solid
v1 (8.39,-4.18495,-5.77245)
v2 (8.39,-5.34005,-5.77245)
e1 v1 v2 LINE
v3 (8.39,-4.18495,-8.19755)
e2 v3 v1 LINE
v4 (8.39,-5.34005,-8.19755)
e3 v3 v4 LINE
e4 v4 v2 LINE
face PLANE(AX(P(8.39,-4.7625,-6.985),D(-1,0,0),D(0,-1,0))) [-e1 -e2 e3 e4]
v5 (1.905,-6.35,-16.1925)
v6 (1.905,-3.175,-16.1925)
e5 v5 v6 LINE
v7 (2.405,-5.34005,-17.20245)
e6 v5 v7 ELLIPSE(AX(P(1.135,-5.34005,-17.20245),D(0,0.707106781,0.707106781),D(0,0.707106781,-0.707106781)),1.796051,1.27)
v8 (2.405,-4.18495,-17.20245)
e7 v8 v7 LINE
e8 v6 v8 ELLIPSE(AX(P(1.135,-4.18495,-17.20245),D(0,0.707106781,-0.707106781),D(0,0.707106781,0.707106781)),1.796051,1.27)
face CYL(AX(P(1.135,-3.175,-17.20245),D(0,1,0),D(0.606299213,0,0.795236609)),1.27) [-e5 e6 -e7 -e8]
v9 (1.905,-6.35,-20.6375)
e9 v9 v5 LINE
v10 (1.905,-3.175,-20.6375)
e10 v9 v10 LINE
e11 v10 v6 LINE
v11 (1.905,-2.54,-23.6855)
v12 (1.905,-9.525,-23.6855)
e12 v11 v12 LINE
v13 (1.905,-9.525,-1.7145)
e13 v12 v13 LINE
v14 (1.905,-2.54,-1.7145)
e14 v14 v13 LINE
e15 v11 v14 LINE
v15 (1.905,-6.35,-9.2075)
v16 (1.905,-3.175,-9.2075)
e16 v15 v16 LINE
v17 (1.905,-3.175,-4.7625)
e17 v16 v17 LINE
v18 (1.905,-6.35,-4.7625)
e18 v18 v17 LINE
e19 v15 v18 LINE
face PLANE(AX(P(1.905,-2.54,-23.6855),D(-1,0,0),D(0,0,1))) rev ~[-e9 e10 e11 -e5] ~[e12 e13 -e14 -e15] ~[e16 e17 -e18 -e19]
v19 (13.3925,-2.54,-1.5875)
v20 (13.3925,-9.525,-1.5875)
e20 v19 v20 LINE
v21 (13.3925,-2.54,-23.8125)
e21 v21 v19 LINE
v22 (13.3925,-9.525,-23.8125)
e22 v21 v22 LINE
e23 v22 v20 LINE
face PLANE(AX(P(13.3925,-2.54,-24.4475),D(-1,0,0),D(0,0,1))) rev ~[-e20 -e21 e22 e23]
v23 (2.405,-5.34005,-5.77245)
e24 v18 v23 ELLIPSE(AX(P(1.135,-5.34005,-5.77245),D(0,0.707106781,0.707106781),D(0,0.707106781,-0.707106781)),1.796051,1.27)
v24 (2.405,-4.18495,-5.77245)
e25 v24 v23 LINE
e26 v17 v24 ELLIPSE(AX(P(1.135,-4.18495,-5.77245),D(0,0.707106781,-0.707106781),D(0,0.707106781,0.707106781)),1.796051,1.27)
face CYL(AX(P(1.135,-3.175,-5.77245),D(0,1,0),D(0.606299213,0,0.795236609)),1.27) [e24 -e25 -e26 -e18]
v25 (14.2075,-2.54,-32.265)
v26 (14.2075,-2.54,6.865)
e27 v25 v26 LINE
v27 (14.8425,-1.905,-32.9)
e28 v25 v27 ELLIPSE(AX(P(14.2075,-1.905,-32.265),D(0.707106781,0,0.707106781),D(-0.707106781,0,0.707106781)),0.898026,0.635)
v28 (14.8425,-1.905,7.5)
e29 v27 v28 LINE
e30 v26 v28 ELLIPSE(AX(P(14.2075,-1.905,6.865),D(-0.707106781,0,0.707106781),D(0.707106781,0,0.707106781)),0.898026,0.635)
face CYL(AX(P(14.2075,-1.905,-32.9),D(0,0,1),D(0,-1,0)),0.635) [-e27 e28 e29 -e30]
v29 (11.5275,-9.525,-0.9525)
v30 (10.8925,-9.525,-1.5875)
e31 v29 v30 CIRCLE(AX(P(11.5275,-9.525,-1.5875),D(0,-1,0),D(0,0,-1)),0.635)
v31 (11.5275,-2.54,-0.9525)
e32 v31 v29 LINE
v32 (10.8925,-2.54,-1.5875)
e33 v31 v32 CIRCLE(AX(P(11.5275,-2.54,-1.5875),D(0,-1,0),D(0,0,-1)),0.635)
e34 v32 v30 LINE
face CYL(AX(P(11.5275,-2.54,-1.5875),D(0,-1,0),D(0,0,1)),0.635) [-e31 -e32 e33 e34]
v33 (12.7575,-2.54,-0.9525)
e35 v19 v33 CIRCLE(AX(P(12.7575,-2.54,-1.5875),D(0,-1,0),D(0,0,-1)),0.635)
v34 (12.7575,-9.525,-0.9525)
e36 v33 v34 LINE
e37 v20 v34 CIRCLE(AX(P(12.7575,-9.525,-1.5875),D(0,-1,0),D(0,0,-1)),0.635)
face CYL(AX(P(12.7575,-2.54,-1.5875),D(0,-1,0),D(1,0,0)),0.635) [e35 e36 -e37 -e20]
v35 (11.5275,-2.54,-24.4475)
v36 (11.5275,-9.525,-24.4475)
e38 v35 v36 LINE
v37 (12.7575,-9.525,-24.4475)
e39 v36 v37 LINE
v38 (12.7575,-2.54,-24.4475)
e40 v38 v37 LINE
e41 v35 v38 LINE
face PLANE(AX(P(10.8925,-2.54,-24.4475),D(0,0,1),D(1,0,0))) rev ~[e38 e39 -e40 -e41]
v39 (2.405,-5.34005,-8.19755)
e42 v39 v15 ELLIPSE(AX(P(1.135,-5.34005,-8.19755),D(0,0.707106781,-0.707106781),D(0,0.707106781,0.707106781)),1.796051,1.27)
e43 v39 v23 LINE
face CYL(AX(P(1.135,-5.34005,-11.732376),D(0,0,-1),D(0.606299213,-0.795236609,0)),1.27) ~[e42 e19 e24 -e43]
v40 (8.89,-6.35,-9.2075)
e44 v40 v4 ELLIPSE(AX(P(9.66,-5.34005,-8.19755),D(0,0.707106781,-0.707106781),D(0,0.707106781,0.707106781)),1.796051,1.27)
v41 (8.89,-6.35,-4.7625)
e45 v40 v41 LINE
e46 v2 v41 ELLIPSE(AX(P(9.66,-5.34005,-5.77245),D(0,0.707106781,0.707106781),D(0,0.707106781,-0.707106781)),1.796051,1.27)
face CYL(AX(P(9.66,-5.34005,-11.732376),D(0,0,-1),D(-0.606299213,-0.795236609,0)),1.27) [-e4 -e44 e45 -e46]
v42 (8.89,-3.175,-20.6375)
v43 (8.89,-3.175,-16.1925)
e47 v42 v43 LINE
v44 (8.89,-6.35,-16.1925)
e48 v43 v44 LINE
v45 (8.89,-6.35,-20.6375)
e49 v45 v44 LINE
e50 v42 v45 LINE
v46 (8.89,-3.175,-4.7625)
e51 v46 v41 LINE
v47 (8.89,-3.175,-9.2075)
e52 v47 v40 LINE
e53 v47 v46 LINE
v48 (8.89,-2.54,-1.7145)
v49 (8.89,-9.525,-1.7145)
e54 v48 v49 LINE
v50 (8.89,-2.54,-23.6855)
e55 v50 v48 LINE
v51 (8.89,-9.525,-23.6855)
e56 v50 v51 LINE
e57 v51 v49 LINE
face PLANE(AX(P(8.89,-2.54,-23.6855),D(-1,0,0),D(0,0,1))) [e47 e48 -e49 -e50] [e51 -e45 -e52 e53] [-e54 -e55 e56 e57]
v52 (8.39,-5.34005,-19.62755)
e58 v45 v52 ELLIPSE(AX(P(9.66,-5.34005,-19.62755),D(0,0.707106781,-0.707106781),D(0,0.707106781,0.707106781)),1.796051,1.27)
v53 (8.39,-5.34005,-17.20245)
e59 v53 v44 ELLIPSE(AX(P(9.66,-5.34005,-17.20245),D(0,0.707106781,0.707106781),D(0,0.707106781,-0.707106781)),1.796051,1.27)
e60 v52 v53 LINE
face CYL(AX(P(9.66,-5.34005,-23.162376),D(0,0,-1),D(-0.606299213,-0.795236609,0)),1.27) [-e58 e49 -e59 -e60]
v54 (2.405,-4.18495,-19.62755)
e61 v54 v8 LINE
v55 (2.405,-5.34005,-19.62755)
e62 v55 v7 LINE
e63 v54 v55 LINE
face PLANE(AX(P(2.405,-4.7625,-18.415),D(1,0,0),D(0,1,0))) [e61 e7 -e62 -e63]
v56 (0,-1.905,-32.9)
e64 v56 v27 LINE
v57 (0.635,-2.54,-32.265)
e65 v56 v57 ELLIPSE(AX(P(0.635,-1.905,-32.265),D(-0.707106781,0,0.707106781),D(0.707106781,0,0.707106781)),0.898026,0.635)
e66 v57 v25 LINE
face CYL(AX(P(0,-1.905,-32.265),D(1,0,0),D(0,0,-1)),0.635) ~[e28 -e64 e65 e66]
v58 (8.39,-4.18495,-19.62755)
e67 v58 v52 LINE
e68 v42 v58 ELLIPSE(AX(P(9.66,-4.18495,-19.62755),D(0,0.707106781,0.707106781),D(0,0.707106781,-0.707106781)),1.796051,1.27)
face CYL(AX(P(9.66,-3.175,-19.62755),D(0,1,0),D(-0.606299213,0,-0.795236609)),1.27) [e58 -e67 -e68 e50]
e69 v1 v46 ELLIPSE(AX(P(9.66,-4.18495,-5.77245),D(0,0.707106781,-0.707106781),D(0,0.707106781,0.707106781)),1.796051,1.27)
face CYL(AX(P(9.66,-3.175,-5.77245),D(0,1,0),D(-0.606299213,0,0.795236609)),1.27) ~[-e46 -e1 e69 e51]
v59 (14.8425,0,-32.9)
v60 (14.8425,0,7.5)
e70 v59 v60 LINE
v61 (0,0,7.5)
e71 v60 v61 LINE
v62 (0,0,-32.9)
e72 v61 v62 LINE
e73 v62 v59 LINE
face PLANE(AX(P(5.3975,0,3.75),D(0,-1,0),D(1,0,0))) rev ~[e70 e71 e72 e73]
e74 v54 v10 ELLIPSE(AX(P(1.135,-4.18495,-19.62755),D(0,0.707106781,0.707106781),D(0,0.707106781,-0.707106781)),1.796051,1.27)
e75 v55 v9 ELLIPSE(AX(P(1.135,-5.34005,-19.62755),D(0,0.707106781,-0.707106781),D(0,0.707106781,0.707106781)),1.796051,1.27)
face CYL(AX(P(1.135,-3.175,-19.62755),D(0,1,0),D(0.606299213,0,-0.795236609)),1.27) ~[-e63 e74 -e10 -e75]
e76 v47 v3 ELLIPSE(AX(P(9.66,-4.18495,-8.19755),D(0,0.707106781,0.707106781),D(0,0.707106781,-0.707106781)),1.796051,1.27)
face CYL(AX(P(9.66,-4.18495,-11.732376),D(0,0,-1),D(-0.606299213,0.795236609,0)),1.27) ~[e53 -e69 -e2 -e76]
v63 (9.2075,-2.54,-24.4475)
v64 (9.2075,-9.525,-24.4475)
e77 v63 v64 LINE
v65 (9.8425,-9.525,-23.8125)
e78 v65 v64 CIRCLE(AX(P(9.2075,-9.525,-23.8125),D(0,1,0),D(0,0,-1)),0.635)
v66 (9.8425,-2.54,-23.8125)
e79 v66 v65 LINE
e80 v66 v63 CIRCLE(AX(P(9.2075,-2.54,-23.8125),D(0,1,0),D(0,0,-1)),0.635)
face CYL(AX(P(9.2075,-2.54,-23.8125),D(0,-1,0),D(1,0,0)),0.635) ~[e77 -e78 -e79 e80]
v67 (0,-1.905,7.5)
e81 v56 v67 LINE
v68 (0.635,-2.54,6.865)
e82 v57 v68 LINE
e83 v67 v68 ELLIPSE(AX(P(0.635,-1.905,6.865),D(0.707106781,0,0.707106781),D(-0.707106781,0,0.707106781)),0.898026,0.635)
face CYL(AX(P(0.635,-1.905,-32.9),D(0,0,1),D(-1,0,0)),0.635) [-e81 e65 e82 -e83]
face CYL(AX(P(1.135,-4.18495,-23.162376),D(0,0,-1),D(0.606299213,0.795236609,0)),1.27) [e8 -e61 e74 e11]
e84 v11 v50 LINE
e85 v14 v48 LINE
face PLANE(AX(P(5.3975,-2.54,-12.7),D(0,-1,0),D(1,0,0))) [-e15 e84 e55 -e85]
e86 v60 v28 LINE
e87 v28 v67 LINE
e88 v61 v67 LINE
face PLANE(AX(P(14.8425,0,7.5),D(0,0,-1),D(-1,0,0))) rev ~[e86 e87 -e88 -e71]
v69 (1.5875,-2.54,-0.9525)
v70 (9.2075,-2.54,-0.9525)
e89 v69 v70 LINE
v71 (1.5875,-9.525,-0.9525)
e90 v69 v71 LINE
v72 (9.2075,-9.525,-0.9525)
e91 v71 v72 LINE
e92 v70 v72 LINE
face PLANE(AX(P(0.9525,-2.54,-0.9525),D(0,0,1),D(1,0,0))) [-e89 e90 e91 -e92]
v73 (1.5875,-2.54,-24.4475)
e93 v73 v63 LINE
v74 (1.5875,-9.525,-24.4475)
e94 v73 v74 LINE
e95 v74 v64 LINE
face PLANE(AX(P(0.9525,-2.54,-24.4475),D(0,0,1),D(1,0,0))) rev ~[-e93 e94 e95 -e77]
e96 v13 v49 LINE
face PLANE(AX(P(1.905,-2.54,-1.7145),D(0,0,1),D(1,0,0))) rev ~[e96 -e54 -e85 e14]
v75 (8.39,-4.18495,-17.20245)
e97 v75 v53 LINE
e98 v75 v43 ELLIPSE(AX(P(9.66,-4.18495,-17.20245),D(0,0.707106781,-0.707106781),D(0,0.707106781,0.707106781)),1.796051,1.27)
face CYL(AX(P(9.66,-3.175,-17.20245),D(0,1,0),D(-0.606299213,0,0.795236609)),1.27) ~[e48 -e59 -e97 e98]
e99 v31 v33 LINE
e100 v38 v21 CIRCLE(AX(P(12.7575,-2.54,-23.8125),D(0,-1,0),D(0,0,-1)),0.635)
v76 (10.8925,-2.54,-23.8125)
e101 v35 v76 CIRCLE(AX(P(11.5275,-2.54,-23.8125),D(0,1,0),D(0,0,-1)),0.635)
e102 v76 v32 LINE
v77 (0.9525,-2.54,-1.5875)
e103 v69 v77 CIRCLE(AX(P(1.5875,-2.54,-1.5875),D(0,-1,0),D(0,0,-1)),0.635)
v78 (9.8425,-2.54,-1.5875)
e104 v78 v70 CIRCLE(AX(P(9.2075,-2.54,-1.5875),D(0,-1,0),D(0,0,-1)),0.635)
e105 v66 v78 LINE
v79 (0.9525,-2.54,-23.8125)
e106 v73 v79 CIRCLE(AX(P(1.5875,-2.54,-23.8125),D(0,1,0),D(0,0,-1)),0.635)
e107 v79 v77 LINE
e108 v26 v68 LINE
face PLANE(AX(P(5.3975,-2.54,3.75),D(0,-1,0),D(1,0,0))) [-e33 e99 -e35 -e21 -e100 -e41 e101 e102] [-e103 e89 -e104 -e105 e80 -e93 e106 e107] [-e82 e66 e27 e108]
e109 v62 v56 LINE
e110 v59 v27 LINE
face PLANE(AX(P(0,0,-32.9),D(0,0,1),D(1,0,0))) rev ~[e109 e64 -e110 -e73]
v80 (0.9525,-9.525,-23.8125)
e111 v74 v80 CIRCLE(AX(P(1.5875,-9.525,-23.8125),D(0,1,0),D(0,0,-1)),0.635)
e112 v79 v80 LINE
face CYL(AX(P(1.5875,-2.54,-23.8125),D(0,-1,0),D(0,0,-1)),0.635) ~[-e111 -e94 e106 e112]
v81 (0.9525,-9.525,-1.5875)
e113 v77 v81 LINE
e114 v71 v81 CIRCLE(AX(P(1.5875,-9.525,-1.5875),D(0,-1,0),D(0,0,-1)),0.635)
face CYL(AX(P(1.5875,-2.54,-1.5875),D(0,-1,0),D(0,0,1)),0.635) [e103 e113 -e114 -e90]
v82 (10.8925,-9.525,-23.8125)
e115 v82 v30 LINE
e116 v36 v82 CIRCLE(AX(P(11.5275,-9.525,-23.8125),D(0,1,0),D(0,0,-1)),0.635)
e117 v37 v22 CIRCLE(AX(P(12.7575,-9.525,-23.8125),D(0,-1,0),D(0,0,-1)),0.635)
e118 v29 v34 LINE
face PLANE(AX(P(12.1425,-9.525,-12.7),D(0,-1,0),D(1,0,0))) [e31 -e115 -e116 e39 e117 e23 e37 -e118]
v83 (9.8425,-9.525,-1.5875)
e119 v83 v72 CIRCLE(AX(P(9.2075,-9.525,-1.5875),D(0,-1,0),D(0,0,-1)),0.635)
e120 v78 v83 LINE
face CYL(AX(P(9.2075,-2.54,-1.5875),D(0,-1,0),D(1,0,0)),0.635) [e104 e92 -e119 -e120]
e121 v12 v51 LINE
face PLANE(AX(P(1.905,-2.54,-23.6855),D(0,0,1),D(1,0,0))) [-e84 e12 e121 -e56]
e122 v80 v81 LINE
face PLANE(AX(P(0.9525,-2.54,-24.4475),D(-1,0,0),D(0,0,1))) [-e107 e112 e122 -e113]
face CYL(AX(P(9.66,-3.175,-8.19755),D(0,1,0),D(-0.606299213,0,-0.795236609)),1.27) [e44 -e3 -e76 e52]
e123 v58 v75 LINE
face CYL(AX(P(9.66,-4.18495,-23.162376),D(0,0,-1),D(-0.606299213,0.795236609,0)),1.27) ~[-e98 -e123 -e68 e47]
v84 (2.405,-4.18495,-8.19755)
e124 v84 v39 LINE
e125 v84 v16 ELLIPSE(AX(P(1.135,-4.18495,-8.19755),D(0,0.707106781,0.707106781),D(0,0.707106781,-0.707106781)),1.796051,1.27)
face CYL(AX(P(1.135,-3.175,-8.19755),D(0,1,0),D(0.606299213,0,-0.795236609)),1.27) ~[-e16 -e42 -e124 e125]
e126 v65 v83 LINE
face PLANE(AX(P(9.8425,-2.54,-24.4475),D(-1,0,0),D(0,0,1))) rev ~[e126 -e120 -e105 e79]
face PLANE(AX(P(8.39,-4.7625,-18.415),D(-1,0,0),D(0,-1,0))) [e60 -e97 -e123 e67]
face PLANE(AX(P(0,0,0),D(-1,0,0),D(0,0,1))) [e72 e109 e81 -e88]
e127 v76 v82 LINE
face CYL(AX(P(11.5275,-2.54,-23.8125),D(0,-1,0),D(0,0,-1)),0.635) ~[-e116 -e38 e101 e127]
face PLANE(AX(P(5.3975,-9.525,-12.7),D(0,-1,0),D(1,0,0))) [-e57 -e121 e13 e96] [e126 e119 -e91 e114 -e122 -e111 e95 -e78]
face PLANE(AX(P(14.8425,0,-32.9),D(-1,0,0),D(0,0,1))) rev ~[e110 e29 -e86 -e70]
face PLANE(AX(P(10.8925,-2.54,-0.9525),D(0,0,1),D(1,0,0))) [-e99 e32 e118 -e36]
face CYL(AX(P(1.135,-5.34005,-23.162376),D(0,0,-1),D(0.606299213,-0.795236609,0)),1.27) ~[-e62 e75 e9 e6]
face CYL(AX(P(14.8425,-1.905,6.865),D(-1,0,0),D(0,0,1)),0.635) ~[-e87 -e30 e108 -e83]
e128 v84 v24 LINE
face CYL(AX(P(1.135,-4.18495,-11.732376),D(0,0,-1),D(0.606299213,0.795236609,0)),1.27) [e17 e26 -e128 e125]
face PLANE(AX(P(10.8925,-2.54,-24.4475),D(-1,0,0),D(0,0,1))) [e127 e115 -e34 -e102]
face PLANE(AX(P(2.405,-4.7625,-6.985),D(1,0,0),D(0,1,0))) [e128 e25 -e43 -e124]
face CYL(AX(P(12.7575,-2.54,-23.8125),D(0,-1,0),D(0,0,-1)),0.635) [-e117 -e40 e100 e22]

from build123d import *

# Parameters (mm, degrees)
F0_W        = 10.795
F0_H        = 25.4
F1_DEPTH    = 2.54
F2_W        = 8.89
F2_H        = 23.495
F2_W_2      = 6.985
F2_H_2      = 21.971
F3_DEPTH    = 6.985
F4_W        = 3.175
F4_H        = 4.445
F5_DEPTH    = 0.5
F6_W        = 3.175
F6_H        = 4.445
F7_DEPTH    = 0.5
F8_T1_DEPTH = 5.6998762346
F8_T3_DEPTH = 9.4947524692
F8_T5_DEPTH = 9.4947524692
F9_W        = 10.795
F9_H        = 7.5
F10_DEPTH   = 2.54
F11_W       = 2.5
F11_H       = 23.495
F12_DEPTH   = 6.985
F13_R       = 0.635


# Not quite as in the source:
# - a fillet or chamfer that OpenCascade refuses, or shapes differently, is made with other operations: its cross-section is extruded or revolved along the edge and cut away or added


with BuildPart() as f1:
    # F0 (on Front) → F1 (new body)
    with BuildSketch(Plane.XZ):
        with Locations((5.3975, -12.7)):
            Rectangle(F0_W, F0_H)
    extrude(amount=F1_DEPTH)

    # F2 (on face) → F3 (join)
    with BuildSketch(Plane.XZ.offset(2.54)):
        with Locations((5.3975, -12.7)):
            Rectangle(F2_W, F2_H)
        with Locations((5.3975, -12.7)):
            Rectangle(F2_W_2, F2_H_2, mode=Mode.SUBTRACT)
    extrude(amount=F3_DEPTH)

    # F4 (on face) → F5 (join)
    with BuildSketch(Plane.YZ.offset(1.905)):
        with Locations((-4.7625, -6.985)):
            Rectangle(F4_W, F4_H)
        with Locations((-4.7625, -18.415)):
            Rectangle(F4_W, F4_H)
    extrude(amount=F5_DEPTH)

    # F6 (on face) → F7 (join)
    with BuildSketch(Plane(origin=(8.89, 0, 0), x_dir=(0, -1, 0), z_dir=(-1, 0, 0))):
        with Locations((4.7625, -6.985)):
            Rectangle(F6_W, F6_H)
        with Locations((4.7625, -18.415)):
            Rectangle(F6_W, F6_H)
    extrude(amount=F7_DEPTH)

    # F8: fillet of radius 1.27 on 16 edges, made by hand

    # F8_s2 → F8_t1 (cut)
    with BuildSketch(Plane.XZ.offset(3.175)):
        with BuildLine():
            ThreePointArc((1.905, -16.1925), (2.273156404, -16.6389791104), (2.405, -17.2024504938))
            Line((2.405, -17.2024504938), (2.405, -16.1925))
            Line((2.405, -16.1925), (1.905, -16.1925))
        make_face()
        with BuildLine():
            ThreePointArc((1.905, -20.6375), (2.273156404, -20.1910208896), (2.405, -19.6275495062))
            Line((2.405, -19.6275495062), (2.405, -20.6375))
            Line((2.405, -20.6375), (1.905, -20.6375))
        make_face()
        with BuildLine():
            ThreePointArc((1.905, -4.7625), (2.273156404, -5.2089791104), (2.405, -5.7724504938))
            Line((2.405, -5.7724504938), (2.405, -4.7625))
            Line((2.405, -4.7625), (1.905, -4.7625))
        make_face()
        with BuildLine():
            ThreePointArc((1.905, -9.2075), (2.273156404, -8.7610208896), (2.405, -8.1975495062))
            Line((2.405, -8.1975495062), (2.405, -9.2075))
            Line((2.405, -9.2075), (1.905, -9.2075))
        make_face()
        with BuildLine():
            ThreePointArc((8.89, -4.7625), (8.521843596, -5.2089791104), (8.39, -5.7724504938))
            Line((8.39, -5.7724504938), (8.39, -4.7625))
            Line((8.39, -4.7625), (8.89, -4.7625))
        make_face()
        with BuildLine():
            ThreePointArc((8.89, -9.2075), (8.521843596, -8.7610208896), (8.39, -8.1975495062))
            Line((8.39, -8.1975495062), (8.39, -9.2075))
            Line((8.39, -9.2075), (8.89, -9.2075))
        make_face()
        with BuildLine():
            ThreePointArc((8.89, -16.1925), (8.521843596, -16.6389791104), (8.39, -17.2024504938))
            Line((8.39, -17.2024504938), (8.39, -16.1925))
            Line((8.39, -16.1925), (8.89, -16.1925))
        make_face()
        with BuildLine():
            ThreePointArc((8.89, -20.6375), (8.521843596, -20.1910208896), (8.39, -19.6275495062))
            Line((8.39, -19.6275495062), (8.39, -20.6375))
            Line((8.39, -20.6375), (8.89, -20.6375))
        make_face()
    extrude(amount=F8_T1_DEPTH, mode=Mode.SUBTRACT)

    # F8_s4 → F8_t3 (cut)
    with BuildSketch(Plane.XY.offset(-23.1623762346)):
        with BuildLine():
            ThreePointArc((1.905, -6.35), (2.273156404, -5.9035208896), (2.405, -5.3400495062))
            Line((2.405, -5.3400495062), (2.405, -6.35))
            Line((2.405, -6.35), (1.905, -6.35))
        make_face()
        with BuildLine():
            ThreePointArc((1.905, -3.175), (2.273156404, -3.6214791104), (2.405, -4.1849504938))
            Line((2.405, -4.1849504938), (2.405, -3.175))
            Line((2.405, -3.175), (1.905, -3.175))
        make_face()
        with BuildLine():
            ThreePointArc((8.89, -3.175), (8.521843596, -3.6214791104), (8.39, -4.1849504938))
            Line((8.39, -4.1849504938), (8.39, -3.175))
            Line((8.39, -3.175), (8.89, -3.175))
        make_face()
        with BuildLine():
            ThreePointArc((8.89, -6.35), (8.521843596, -5.9035208896), (8.39, -5.3400495062))
            Line((8.39, -5.3400495062), (8.39, -6.35))
            Line((8.39, -6.35), (8.89, -6.35))
        make_face()
    extrude(amount=F8_T3_DEPTH, mode=Mode.SUBTRACT)

    # F8_s6 → F8_t5 (cut)
    with BuildSketch(Plane.XY.offset(-11.7323762346)):
        with BuildLine():
            ThreePointArc((1.905, -6.35), (2.273156404, -5.9035208896), (2.405, -5.3400495062))
            Line((2.405, -5.3400495062), (2.405, -6.35))
            Line((2.405, -6.35), (1.905, -6.35))
        make_face()
        with BuildLine():
            ThreePointArc((1.905, -3.175), (2.273156404, -3.6214791104), (2.405, -4.1849504938))
            Line((2.405, -4.1849504938), (2.405, -3.175))
            Line((2.405, -3.175), (1.905, -3.175))
        make_face()
        with BuildLine():
            ThreePointArc((8.89, -3.175), (8.521843596, -3.6214791104), (8.39, -4.1849504938))
            Line((8.39, -4.1849504938), (8.39, -3.175))
            Line((8.39, -3.175), (8.89, -3.175))
        make_face()
        with BuildLine():
            ThreePointArc((8.89, -6.35), (8.521843596, -5.9035208896), (8.39, -5.3400495062))
            Line((8.39, -5.3400495062), (8.39, -6.35))
            Line((8.39, -6.35), (8.89, -6.35))
        make_face()
    extrude(amount=F8_T5_DEPTH, mode=Mode.SUBTRACT)

    # F9 (on Front) → F10 (join)
    with BuildSketch(Plane.XZ):
        with Locations((5.3975, 3.75)):
            Rectangle(F9_W, F9_H)
        Polygon((10.795, 7.5), (10.795, 0), (10.795, -25.4), (10.795, -32.9), (14.8425, -32.9), (14.8425, 7.5), align=None)
        with Locations((5.3975, -29.15)):
            Rectangle(F9_W, F9_H)
    extrude(amount=F10_DEPTH)

    # F11 (on face) → F12 (join)
    with BuildSketch(Plane.XZ.offset(2.54)):
        with Locations((12.1425, -12.7)):
            Rectangle(F11_W, F11_H)
    extrude(amount=F12_DEPTH)

    # F13
    f13_edges = [f1.edges().sort_by_distance(p)[0] for p in [
        (0.9525, -6.0325, -0.9525),
        (9.8425, -6.0325, -0.9525),
        (9.8425, -6.0325, -24.4475),
        (0.9525, -6.0325, -24.4475),
        (0, -2.54, -12.7),
        (10.8925, -6.0325, -24.4475),
        (13.3925, -6.0325, -24.4475),
        (10.8925, -6.0325, -0.9525),
        (13.3925, -6.0325, -0.9525),
        (14.8425, -2.54, -12.7),
        (7.42125, -2.54, -32.9),
        (7.42125, -2.54, 7.5),
    ]]
    fillet(f13_edges, radius=F13_R)


solid = f1.part
